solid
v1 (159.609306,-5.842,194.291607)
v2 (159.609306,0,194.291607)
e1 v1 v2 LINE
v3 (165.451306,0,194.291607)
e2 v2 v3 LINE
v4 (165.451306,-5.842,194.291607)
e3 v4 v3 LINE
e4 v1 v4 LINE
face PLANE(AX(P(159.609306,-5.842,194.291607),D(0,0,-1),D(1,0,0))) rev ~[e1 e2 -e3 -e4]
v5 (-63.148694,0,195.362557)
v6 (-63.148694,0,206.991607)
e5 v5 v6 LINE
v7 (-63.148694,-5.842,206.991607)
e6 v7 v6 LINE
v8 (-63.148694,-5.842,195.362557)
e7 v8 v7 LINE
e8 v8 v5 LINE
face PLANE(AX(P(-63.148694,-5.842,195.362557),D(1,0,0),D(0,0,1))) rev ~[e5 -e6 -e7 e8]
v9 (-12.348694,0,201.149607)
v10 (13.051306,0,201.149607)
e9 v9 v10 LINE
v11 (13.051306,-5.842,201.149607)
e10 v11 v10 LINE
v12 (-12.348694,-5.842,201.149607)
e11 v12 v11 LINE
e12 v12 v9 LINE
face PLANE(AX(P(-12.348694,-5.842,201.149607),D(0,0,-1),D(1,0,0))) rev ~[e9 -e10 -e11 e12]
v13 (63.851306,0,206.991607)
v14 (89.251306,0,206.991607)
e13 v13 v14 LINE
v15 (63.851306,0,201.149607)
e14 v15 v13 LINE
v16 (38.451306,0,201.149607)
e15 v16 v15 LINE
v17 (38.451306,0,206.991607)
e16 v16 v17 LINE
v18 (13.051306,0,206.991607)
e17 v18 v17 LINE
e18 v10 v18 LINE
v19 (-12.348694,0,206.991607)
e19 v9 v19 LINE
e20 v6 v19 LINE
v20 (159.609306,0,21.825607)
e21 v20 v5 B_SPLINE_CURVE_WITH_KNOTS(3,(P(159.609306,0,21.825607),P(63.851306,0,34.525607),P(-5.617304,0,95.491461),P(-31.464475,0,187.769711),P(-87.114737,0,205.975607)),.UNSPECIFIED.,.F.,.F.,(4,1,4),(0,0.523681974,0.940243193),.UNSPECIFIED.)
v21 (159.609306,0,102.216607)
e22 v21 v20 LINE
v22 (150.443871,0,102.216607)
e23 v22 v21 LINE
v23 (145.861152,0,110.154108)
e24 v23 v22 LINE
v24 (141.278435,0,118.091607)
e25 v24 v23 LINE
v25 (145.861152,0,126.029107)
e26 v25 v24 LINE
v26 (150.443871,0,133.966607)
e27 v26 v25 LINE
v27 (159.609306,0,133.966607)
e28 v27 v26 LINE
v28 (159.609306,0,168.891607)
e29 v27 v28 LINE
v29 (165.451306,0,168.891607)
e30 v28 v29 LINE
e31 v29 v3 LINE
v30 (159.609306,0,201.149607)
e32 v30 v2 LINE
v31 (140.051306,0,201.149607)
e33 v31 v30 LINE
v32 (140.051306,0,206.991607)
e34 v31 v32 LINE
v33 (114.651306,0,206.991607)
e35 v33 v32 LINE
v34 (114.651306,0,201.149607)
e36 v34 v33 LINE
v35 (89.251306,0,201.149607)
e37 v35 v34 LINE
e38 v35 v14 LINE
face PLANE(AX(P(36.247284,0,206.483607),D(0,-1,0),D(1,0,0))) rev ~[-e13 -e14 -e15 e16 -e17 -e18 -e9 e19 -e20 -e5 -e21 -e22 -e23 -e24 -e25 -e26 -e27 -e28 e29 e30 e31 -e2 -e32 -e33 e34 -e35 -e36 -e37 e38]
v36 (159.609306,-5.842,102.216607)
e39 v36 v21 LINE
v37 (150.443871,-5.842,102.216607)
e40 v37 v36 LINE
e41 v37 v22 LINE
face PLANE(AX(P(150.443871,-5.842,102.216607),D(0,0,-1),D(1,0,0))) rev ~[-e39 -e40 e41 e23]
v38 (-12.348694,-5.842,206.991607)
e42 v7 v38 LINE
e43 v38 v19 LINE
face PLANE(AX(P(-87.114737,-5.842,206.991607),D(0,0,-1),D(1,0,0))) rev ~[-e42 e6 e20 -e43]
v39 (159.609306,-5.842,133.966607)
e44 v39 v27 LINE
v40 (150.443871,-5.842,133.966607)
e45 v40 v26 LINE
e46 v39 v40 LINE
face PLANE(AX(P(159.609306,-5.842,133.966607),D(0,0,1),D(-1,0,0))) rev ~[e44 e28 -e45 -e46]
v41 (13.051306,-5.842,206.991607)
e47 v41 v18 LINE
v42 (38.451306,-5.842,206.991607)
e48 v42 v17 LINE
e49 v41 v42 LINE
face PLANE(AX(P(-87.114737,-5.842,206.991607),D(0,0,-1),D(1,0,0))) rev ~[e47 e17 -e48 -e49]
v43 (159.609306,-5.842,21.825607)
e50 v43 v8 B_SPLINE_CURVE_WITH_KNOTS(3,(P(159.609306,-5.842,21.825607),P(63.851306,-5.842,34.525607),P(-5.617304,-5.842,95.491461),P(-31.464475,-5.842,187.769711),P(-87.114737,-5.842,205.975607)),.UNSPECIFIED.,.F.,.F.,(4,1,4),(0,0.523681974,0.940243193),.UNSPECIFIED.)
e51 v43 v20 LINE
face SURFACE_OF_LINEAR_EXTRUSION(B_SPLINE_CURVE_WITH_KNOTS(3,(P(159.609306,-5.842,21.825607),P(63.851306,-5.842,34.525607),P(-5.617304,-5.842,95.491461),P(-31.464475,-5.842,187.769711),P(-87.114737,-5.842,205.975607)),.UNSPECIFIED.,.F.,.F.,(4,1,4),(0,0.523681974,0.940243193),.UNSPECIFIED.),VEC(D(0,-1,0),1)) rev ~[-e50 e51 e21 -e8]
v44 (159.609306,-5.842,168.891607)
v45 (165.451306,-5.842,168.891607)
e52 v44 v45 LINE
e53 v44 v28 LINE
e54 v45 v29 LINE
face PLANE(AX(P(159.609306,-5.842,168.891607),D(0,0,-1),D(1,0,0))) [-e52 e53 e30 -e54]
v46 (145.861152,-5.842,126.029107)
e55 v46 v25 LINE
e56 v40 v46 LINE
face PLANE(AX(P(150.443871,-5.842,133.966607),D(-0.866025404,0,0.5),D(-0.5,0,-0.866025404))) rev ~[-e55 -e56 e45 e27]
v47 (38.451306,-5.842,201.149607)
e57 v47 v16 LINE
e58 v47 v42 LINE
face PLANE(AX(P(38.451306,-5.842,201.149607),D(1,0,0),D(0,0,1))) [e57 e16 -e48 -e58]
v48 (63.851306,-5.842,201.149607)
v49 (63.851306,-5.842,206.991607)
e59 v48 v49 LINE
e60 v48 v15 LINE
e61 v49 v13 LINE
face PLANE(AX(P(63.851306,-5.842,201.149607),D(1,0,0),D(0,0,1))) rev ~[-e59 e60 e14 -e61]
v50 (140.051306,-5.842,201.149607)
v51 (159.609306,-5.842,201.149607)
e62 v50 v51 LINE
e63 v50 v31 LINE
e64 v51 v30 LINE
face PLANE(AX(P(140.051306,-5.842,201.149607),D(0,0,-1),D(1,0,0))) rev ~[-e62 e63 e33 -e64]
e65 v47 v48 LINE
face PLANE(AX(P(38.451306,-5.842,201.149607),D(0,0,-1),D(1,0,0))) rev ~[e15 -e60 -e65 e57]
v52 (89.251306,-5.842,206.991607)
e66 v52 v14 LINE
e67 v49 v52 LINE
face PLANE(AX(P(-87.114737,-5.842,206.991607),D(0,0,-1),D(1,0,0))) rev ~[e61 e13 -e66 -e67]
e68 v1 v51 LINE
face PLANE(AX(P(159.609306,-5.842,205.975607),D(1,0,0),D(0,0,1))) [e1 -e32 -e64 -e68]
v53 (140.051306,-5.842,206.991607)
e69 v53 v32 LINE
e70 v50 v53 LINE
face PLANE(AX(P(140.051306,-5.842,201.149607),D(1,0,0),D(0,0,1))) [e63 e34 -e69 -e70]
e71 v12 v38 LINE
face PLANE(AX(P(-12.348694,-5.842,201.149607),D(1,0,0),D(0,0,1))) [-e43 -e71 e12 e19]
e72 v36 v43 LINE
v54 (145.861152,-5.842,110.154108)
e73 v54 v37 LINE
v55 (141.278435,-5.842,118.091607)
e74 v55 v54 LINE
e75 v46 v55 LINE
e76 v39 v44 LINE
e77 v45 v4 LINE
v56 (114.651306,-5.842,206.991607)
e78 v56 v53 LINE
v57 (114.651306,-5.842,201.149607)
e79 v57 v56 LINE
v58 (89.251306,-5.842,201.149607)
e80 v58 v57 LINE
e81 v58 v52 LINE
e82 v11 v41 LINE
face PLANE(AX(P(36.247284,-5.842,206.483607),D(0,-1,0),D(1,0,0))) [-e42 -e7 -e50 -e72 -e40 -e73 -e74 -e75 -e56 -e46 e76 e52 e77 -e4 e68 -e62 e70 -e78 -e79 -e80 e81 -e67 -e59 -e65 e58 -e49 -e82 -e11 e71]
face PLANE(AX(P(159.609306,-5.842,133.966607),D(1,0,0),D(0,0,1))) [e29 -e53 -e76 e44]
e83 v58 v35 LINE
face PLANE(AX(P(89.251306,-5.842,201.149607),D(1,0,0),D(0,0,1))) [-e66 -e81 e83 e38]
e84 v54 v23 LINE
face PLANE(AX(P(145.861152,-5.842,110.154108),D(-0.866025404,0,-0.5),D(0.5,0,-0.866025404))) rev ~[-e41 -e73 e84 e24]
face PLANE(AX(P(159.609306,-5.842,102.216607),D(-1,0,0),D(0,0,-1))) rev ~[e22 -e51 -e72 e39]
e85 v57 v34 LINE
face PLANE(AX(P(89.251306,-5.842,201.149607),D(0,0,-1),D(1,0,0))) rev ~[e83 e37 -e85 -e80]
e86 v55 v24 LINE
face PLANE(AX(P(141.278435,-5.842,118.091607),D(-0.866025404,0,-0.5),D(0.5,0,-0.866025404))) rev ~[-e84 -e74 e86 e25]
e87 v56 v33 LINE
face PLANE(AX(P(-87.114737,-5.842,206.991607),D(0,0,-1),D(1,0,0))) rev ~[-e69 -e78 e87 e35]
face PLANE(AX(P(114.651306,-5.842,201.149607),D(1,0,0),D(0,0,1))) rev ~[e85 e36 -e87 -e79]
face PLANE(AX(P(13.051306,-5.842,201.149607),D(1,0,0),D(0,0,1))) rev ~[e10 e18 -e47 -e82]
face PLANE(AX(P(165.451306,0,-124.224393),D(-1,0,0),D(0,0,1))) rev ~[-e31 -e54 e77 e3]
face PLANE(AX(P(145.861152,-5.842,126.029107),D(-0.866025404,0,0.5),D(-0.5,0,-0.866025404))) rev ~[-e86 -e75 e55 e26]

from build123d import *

# Parameters (mm, degrees)
F0_W      = 279.4
F0_H      = 330.2
F1_DEPTH  = 5.842
F2_W      = 25.4
F2_H      = 5.842
F2_W_2    = 76.2
F2_W_3    = 5.842
F2_H_2    = 25.4
F2_H_3    = 38.1
F3_DEPTH  = 5.842
F5_W      = 5.842
F5_H      = 12.7
F6_DEPTH  = 5.842
F7_DEPTH  = 5.842
F8_W      = 5.842
F8_H      = 25.4
F8_H_2    = 48.641
F8_H_3    = 34.925
F8_H_4    = 11.684
F9_DEPTH  = 5.842
F10_W     = 246.7240431406
F10_H     = 1.016
F11_DEPTH = 5.842
F13_W     = 25.4
F13_H     = 5.842
F13_W_2   = 19.558
F14_DEPTH = 5.842


# Not quite as in the source:
# - a feature names something its author has since deleted; it is built from what else it names


with BuildPart() as f1:
    # F0 (on Front) → F1 (new body)
    with BuildSketch(Plane.XZ):
        with Locations((25.751306051, 40.8756073241)):
            Rectangle(F0_W, F0_H)
    extrude(amount=F1_DEPTH)

    # F2 (on face) → F3 (cut, through all)
    with BuildSketch(Plane.XZ.offset(5.842)):
        with Locations((152.751306051, -121.3033926759)):
            Rectangle(F2_W, F2_H)
        with Locations((101.951306051, -121.3033926759)):
            Rectangle(F2_W, F2_H)
        with Locations((51.151306051, -121.3033926759)):
            Rectangle(F2_W, F2_H)
        with Locations((0.351306051, -121.3033926759)):
            Rectangle(F2_W, F2_H)
        with Locations((-75.848693949, -121.3033926759)):
            Rectangle(F2_W_2, F2_H)
        with Locations((162.530306051, -86.1243926759)):
            Rectangle(F2_W_3, F2_H_2)
        with Locations((162.530306051, -28.9743926759)):
            Rectangle(F2_W_3, F2_H_3)
        with Locations((-111.027693949, -86.1243926759)):
            Rectangle(F2_W_3, F2_H_2)
        with Locations((-111.027693949, -35.3243926759)):
            Rectangle(F2_W_3, F2_H_2)
        with Locations((-111.027693949, 15.4756073241)):
            Rectangle(F2_W_3, F2_H_2)
        with Locations((-111.027693949, 66.2756073241)):
            Rectangle(F2_W_3, F2_H_2)
        with Locations((-111.027693949, 167.8756073241)):
            Rectangle(F2_W_3, F2_H_2)
        with Locations((-111.027693949, 117.0756073241)):
            Rectangle(F2_W_3, F2_H_2)
    extrude(amount=-F3_DEPTH, mode=Mode.SUBTRACT)

    # F5 (on face) → F6 (cut, through all)
    with BuildSketch(Plane.XZ.offset(5.842)):
        with Locations((162.530306051, 2.7756073241)):
            Rectangle(F5_W, F5_H)
    extrude(amount=-F6_DEPTH, mode=Mode.SUBTRACT)

    # F4 (on face) → F7 (cut, through all)
    with BuildSketch(Plane.XZ.offset(5.842)):
        with BuildLine():
            Line((165.451306051, 15.4756073241), (159.609306051, 15.4756073241))
            add(Edge.make_bspline(
                [(159.609306051, 15.4756073241), (73.376306051, 28.1756073241), (-24.3765935073, 60.3637718481), (-21.873693949, 193.2756073241), (-113.948693949, 205.9756073241)],
                knots=[0, 0, 0, 0, 0.507272, 1, 1, 1, 1], degree=3))
            Line((-113.948693949, 205.9756073241), (-113.948693949, 180.5756073241))
            Line((-113.948693949, 180.5756073241), (-108.106693949, 180.5756073241))
            Line((-108.106693949, 180.5756073241), (-108.106693949, 155.1756073241))
            Line((-108.106693949, 155.1756073241), (-113.948693949, 155.1756073241))
            Line((-113.948693949, 155.1756073241), (-113.948693949, 129.7756073241))
            Line((-113.948693949, 129.7756073241), (-108.106693949, 129.7756073241))
            Line((-108.106693949, 129.7756073241), (-108.106693949, 104.3756073241))
            Line((-108.106693949, 104.3756073241), (-113.948693949, 104.3756073241))
            Line((-113.948693949, 104.3756073241), (-113.948693949, 78.9756073241))
            Line((-113.948693949, 78.9756073241), (-108.106693949, 78.9756073241))
            Line((-108.106693949, 78.9756073241), (-108.106693949, 53.5756073241))
            Line((-108.106693949, 53.5756073241), (-113.948693949, 53.5756073241))
            Line((-113.948693949, 53.5756073241), (-113.948693949, 28.1756073241))
            Line((-113.948693949, 28.1756073241), (-108.106693949, 28.1756073241))
            Line((-108.106693949, 28.1756073241), (-108.106693949, 2.7756073241))
            Line((-108.106693949, 2.7756073241), (-113.948693949, 2.7756073241))
            Line((-113.948693949, 2.7756073241), (-113.948693949, -22.6243926759))
            Line((-113.948693949, -22.6243926759), (-108.106693949, -22.6243926759))
            Line((-108.106693949, -22.6243926759), (-108.106693949, -48.0243926759))
            Line((-108.106693949, -48.0243926759), (-113.948693949, -48.0243926759))
            Line((-113.948693949, -48.0243926759), (-113.948693949, -73.4243926759))
            Line((-113.948693949, -73.4243926759), (-108.106693949, -73.4243926759))
            Line((-108.106693949, -73.4243926759), (-108.106693949, -98.8243926759))
            Line((-108.106693949, -98.8243926759), (-113.948693949, -98.8243926759))
            Line((-113.948693949, -98.8243926759), (-113.948693949, -118.3823926759))
            Line((-113.948693949, -118.3823926759), (-37.748693949, -118.3823926759))
            Line((-37.748693949, -118.3823926759), (-37.748693949, -124.2243926759))
            Line((-37.748693949, -124.2243926759), (-12.348693949, -124.2243926759))
            Line((-12.348693949, -124.2243926759), (-12.348693949, -118.3823926759))
            Line((-12.348693949, -118.3823926759), (13.051306051, -118.3823926759))
            Line((13.051306051, -118.3823926759), (13.051306051, -124.2243926759))
            Line((13.051306051, -124.2243926759), (38.451306051, -124.2243926759))
            Line((38.451306051, -124.2243926759), (38.451306051, -118.3823926759))
            Line((38.451306051, -118.3823926759), (63.851306051, -118.3823926759))
            Line((63.851306051, -118.3823926759), (63.851306051, -124.2243926759))
            Line((63.851306051, -124.2243926759), (89.251306051, -124.2243926759))
            Line((89.251306051, -124.2243926759), (89.251306051, -118.3823926759))
            Line((89.251306051, -118.3823926759), (114.651306051, -118.3823926759))
            Line((114.651306051, -118.3823926759), (114.651306051, -124.2243926759))
            Line((114.651306051, -124.2243926759), (140.051306051, -124.2243926759))
            Line((140.051306051, -124.2243926759), (140.051306051, -118.3823926759))
            Line((140.051306051, -118.3823926759), (165.451306051, -118.3823926759))
            Line((165.451306051, -118.3823926759), (165.451306051, -98.8243926759))
            Line((165.451306051, -98.8243926759), (159.609306051, -98.8243926759))
            Line((159.609306051, -98.8243926759), (159.609306051, -73.4243926759))
            Line((159.609306051, -73.4243926759), (165.451306051, -73.4243926759))
            Line((165.451306051, -73.4243926759), (165.451306051, -48.0243926759))
            Line((165.451306051, -48.0243926759), (159.609306051, -48.0243926759))
            Line((159.609306051, -48.0243926759), (159.609306051, -9.9243926759))
            Line((159.609306051, -9.9243926759), (165.451306051, -9.9243926759))
            Line((165.451306051, -9.9243926759), (165.451306051, 15.4756073241))
        make_face()
        with BuildLine():
            add(Edge.make_bspline(
                [(159.609306051, 15.4756073241), (73.376306051, 28.1756073241), (-24.3765935073, 60.3637718481), (-21.873693949, 193.2756073241), (-113.948693949, 205.9756073241)],
                knots=[0, 0, 0, 0, 0.507272, 1, 1, 1, 1], degree=3))
            Line((159.609306051, 15.4756073241), (159.609306051, 21.8256073241))
            add(Edge.make_bspline(
                [(159.609306051, 21.8256073241), (63.851306051, 34.5256073241), (-5.6173037023, 95.4914607938), (-31.4644745687, 187.7697107475), (-87.114737086, 205.9756073241)],
                knots=[0, 0, 0, 0, 0.5236819738, 0.940243193, 0.940243193, 0.940243193, 0.940243193], degree=3))
            Line((-87.114737086, 205.9756073241), (-113.948693949, 205.9756073241))
        make_face()
    extrude(amount=-F7_DEPTH, mode=Mode.SUBTRACT)

    # F8 (on face) → F9 (cut, through all)
    with BuildSketch(Plane.XZ.offset(5.842)):
        Polygon((165.451306051, 15.4756073241), (165.451306051, 28.1756073241), (159.609306051, 28.1756073241), (159.609306051, 21.8256073241), (159.609306051, 15.4756073241), align=None)
        with Locations((162.530306051, 40.8756073241)):
            Rectangle(F8_W, F8_H)
        with Locations((162.530306051, 77.8961073241)):
            Rectangle(F8_W, F8_H_2)
        with BuildLine():
            Line((159.609306051, 102.2166073241), (165.451306051, 102.2166073241))
            Line((165.451306051, 102.2166073241), (165.451306051, 103.3306229057))
            ThreePointArc((165.451306051, 103.3306229057), (162.5829399691, 102.4975980153), (159.609306051, 102.2166073241))
        make_face()
        with BuildLine():
            ThreePointArc((145.861152343, 110.1541080567), (151.6718056847, 104.3434542505), (159.609306051, 102.2166073241))
            Line((159.609306051, 102.2166073241), (159.609306051, 133.9666073241))
            ThreePointArc((159.609306051, 133.9666073241), (151.6718056847, 131.8397603977), (145.861152343, 126.0291065915))
            ThreePointArc((145.861152343, 126.0291065915), (143.734306051, 118.0916073241), (145.861152343, 110.1541080567))
        make_face()
        with BuildLine():
            Line((150.4438705276, 102.2166073241), (159.609306051, 102.2166073241))
            ThreePointArc((159.609306051, 102.2166073241), (151.6718056847, 104.3434542505), (145.861152343, 110.1541080567))
            Line((145.861152343, 110.1541080567), (150.4438705276, 102.2166073241))
        make_face()
        with BuildLine():
            Line((159.609306051, 133.9666073241), (159.609306051, 102.2166073241))
            ThreePointArc((159.609306051, 102.2166073241), (162.5829399691, 102.4975980153), (165.451306051, 103.3306229057))
            Line((165.451306051, 103.3306229057), (165.451306051, 132.8525917425))
            ThreePointArc((165.451306051, 132.8525917425), (162.5829399691, 133.6856166328), (159.609306051, 133.9666073241))
        make_face()
        with BuildLine():
            Line((165.451306051, 133.9666073241), (159.609306051, 133.9666073241))
            ThreePointArc((159.609306051, 133.9666073241), (162.5829399691, 133.6856166328), (165.451306051, 132.8525917425))
            Line((165.451306051, 132.8525917425), (165.451306051, 133.9666073241))
        make_face()
        with BuildLine():
            ThreePointArc((145.861152343, 126.0291065915), (151.6718056847, 131.8397603977), (159.609306051, 133.9666073241))
            Line((159.609306051, 133.9666073241), (150.4438705276, 133.9666073241))
            Line((150.4438705276, 133.9666073241), (145.861152343, 126.0291065915))
        make_face()
        with Locations((162.530306051, 151.4291073241)):
            Rectangle(F8_W, F8_H_3)
        with BuildLine():
            Line((141.2784350042, 118.0916073241), (145.861152343, 110.1541080567))
            ThreePointArc((145.861152343, 110.1541080567), (143.734306051, 118.0916073241), (145.861152343, 126.0291065915))
            Line((145.861152343, 126.0291065915), (141.2784350042, 118.0916073241))
        make_face()
        with Locations((162.530306051, 200.1336073241)):
            Rectangle(F8_W, F8_H_4)
    extrude(amount=-F9_DEPTH, mode=Mode.SUBTRACT)

    # F10 (on face) → F11 (join, through all)
    with BuildSketch(Plane.XZ.offset(5.842)):
        with Locations((36.2472844807, 206.4836073241)):
            Rectangle(F10_W, F10_H)
    extrude(amount=-F11_DEPTH)

    # F13 (on face) → F14 (cut, through all)
    with BuildSketch(Plane.XZ.offset(5.842)):
        with Locations((51.151306051, 204.0706073241)):
            Rectangle(F13_W, F13_H)
        with Locations((101.951306051, 204.0706073241)):
            Rectangle(F13_W, F13_H)
        with Locations((149.830306051, 204.0706073241)):
            Rectangle(F13_W_2, F13_H)
        with BuildLine():
            add(Edge.make_bspline(
                [(-64.0656111495, 195.8912068503), (-64.4986133811, 197.8821506555), (-64.5462177809, 200.9608220943), (-64.8897370896, 206.9916073241)],
                knots=[0.7783755915, 0.7783755915, 0.7783755915, 0.7783755915, 1, 1, 1, 1], degree=3))
            Line((-64.8897370896, 206.9916073241), (-87.1147370896, 206.9916073241))
            Line((-87.1147370896, 206.9916073241), (-87.1147370896, 205.9756073241))
            add(Edge.make_bspline(
                [(-64.0656111419, 195.8912068549), (-70.8038372609, 199.7329606353), (-78.4197996839, 203.1310721158), (-87.114737086, 205.9756073241)],
                knots=[0.8751586172, 0.8751586172, 0.8751586172, 0.8751586172, 0.940243193, 0.940243193, 0.940243193, 0.940243193], degree=3))
        make_face()
        with Locations((0.351306051, 204.0706073241)):
            Rectangle(F13_W, F13_H)
        with BuildLine():
            Line((-63.148693949, 195.362557311), (-63.148693949, 206.9916073241))
            Line((-63.148693949, 206.9916073241), (-64.8897370896, 206.9916073241))
            add(Edge.make_bspline(
                [(-64.0656111495, 195.8912068503), (-64.4986133811, 197.8821506555), (-64.5462177809, 200.9608220943), (-64.8897370896, 206.9916073241)],
                knots=[0.7783755915, 0.7783755915, 0.7783755915, 0.7783755915, 1, 1, 1, 1], degree=3))
            add(Edge.make_bspline(
                [(-63.148693949, 195.362557311), (-63.4525182871, 195.5396905387), (-63.7581509788, 195.7159105346), (-64.0656111419, 195.8912068549)],
                knots=[0.8721888572, 0.8721888572, 0.8721888572, 0.8721888572, 0.8751586172, 0.8751586172, 0.8751586172, 0.8751586172], degree=3))
        make_face()
    extrude(amount=-F14_DEPTH, mode=Mode.SUBTRACT)


solid = f1.part
